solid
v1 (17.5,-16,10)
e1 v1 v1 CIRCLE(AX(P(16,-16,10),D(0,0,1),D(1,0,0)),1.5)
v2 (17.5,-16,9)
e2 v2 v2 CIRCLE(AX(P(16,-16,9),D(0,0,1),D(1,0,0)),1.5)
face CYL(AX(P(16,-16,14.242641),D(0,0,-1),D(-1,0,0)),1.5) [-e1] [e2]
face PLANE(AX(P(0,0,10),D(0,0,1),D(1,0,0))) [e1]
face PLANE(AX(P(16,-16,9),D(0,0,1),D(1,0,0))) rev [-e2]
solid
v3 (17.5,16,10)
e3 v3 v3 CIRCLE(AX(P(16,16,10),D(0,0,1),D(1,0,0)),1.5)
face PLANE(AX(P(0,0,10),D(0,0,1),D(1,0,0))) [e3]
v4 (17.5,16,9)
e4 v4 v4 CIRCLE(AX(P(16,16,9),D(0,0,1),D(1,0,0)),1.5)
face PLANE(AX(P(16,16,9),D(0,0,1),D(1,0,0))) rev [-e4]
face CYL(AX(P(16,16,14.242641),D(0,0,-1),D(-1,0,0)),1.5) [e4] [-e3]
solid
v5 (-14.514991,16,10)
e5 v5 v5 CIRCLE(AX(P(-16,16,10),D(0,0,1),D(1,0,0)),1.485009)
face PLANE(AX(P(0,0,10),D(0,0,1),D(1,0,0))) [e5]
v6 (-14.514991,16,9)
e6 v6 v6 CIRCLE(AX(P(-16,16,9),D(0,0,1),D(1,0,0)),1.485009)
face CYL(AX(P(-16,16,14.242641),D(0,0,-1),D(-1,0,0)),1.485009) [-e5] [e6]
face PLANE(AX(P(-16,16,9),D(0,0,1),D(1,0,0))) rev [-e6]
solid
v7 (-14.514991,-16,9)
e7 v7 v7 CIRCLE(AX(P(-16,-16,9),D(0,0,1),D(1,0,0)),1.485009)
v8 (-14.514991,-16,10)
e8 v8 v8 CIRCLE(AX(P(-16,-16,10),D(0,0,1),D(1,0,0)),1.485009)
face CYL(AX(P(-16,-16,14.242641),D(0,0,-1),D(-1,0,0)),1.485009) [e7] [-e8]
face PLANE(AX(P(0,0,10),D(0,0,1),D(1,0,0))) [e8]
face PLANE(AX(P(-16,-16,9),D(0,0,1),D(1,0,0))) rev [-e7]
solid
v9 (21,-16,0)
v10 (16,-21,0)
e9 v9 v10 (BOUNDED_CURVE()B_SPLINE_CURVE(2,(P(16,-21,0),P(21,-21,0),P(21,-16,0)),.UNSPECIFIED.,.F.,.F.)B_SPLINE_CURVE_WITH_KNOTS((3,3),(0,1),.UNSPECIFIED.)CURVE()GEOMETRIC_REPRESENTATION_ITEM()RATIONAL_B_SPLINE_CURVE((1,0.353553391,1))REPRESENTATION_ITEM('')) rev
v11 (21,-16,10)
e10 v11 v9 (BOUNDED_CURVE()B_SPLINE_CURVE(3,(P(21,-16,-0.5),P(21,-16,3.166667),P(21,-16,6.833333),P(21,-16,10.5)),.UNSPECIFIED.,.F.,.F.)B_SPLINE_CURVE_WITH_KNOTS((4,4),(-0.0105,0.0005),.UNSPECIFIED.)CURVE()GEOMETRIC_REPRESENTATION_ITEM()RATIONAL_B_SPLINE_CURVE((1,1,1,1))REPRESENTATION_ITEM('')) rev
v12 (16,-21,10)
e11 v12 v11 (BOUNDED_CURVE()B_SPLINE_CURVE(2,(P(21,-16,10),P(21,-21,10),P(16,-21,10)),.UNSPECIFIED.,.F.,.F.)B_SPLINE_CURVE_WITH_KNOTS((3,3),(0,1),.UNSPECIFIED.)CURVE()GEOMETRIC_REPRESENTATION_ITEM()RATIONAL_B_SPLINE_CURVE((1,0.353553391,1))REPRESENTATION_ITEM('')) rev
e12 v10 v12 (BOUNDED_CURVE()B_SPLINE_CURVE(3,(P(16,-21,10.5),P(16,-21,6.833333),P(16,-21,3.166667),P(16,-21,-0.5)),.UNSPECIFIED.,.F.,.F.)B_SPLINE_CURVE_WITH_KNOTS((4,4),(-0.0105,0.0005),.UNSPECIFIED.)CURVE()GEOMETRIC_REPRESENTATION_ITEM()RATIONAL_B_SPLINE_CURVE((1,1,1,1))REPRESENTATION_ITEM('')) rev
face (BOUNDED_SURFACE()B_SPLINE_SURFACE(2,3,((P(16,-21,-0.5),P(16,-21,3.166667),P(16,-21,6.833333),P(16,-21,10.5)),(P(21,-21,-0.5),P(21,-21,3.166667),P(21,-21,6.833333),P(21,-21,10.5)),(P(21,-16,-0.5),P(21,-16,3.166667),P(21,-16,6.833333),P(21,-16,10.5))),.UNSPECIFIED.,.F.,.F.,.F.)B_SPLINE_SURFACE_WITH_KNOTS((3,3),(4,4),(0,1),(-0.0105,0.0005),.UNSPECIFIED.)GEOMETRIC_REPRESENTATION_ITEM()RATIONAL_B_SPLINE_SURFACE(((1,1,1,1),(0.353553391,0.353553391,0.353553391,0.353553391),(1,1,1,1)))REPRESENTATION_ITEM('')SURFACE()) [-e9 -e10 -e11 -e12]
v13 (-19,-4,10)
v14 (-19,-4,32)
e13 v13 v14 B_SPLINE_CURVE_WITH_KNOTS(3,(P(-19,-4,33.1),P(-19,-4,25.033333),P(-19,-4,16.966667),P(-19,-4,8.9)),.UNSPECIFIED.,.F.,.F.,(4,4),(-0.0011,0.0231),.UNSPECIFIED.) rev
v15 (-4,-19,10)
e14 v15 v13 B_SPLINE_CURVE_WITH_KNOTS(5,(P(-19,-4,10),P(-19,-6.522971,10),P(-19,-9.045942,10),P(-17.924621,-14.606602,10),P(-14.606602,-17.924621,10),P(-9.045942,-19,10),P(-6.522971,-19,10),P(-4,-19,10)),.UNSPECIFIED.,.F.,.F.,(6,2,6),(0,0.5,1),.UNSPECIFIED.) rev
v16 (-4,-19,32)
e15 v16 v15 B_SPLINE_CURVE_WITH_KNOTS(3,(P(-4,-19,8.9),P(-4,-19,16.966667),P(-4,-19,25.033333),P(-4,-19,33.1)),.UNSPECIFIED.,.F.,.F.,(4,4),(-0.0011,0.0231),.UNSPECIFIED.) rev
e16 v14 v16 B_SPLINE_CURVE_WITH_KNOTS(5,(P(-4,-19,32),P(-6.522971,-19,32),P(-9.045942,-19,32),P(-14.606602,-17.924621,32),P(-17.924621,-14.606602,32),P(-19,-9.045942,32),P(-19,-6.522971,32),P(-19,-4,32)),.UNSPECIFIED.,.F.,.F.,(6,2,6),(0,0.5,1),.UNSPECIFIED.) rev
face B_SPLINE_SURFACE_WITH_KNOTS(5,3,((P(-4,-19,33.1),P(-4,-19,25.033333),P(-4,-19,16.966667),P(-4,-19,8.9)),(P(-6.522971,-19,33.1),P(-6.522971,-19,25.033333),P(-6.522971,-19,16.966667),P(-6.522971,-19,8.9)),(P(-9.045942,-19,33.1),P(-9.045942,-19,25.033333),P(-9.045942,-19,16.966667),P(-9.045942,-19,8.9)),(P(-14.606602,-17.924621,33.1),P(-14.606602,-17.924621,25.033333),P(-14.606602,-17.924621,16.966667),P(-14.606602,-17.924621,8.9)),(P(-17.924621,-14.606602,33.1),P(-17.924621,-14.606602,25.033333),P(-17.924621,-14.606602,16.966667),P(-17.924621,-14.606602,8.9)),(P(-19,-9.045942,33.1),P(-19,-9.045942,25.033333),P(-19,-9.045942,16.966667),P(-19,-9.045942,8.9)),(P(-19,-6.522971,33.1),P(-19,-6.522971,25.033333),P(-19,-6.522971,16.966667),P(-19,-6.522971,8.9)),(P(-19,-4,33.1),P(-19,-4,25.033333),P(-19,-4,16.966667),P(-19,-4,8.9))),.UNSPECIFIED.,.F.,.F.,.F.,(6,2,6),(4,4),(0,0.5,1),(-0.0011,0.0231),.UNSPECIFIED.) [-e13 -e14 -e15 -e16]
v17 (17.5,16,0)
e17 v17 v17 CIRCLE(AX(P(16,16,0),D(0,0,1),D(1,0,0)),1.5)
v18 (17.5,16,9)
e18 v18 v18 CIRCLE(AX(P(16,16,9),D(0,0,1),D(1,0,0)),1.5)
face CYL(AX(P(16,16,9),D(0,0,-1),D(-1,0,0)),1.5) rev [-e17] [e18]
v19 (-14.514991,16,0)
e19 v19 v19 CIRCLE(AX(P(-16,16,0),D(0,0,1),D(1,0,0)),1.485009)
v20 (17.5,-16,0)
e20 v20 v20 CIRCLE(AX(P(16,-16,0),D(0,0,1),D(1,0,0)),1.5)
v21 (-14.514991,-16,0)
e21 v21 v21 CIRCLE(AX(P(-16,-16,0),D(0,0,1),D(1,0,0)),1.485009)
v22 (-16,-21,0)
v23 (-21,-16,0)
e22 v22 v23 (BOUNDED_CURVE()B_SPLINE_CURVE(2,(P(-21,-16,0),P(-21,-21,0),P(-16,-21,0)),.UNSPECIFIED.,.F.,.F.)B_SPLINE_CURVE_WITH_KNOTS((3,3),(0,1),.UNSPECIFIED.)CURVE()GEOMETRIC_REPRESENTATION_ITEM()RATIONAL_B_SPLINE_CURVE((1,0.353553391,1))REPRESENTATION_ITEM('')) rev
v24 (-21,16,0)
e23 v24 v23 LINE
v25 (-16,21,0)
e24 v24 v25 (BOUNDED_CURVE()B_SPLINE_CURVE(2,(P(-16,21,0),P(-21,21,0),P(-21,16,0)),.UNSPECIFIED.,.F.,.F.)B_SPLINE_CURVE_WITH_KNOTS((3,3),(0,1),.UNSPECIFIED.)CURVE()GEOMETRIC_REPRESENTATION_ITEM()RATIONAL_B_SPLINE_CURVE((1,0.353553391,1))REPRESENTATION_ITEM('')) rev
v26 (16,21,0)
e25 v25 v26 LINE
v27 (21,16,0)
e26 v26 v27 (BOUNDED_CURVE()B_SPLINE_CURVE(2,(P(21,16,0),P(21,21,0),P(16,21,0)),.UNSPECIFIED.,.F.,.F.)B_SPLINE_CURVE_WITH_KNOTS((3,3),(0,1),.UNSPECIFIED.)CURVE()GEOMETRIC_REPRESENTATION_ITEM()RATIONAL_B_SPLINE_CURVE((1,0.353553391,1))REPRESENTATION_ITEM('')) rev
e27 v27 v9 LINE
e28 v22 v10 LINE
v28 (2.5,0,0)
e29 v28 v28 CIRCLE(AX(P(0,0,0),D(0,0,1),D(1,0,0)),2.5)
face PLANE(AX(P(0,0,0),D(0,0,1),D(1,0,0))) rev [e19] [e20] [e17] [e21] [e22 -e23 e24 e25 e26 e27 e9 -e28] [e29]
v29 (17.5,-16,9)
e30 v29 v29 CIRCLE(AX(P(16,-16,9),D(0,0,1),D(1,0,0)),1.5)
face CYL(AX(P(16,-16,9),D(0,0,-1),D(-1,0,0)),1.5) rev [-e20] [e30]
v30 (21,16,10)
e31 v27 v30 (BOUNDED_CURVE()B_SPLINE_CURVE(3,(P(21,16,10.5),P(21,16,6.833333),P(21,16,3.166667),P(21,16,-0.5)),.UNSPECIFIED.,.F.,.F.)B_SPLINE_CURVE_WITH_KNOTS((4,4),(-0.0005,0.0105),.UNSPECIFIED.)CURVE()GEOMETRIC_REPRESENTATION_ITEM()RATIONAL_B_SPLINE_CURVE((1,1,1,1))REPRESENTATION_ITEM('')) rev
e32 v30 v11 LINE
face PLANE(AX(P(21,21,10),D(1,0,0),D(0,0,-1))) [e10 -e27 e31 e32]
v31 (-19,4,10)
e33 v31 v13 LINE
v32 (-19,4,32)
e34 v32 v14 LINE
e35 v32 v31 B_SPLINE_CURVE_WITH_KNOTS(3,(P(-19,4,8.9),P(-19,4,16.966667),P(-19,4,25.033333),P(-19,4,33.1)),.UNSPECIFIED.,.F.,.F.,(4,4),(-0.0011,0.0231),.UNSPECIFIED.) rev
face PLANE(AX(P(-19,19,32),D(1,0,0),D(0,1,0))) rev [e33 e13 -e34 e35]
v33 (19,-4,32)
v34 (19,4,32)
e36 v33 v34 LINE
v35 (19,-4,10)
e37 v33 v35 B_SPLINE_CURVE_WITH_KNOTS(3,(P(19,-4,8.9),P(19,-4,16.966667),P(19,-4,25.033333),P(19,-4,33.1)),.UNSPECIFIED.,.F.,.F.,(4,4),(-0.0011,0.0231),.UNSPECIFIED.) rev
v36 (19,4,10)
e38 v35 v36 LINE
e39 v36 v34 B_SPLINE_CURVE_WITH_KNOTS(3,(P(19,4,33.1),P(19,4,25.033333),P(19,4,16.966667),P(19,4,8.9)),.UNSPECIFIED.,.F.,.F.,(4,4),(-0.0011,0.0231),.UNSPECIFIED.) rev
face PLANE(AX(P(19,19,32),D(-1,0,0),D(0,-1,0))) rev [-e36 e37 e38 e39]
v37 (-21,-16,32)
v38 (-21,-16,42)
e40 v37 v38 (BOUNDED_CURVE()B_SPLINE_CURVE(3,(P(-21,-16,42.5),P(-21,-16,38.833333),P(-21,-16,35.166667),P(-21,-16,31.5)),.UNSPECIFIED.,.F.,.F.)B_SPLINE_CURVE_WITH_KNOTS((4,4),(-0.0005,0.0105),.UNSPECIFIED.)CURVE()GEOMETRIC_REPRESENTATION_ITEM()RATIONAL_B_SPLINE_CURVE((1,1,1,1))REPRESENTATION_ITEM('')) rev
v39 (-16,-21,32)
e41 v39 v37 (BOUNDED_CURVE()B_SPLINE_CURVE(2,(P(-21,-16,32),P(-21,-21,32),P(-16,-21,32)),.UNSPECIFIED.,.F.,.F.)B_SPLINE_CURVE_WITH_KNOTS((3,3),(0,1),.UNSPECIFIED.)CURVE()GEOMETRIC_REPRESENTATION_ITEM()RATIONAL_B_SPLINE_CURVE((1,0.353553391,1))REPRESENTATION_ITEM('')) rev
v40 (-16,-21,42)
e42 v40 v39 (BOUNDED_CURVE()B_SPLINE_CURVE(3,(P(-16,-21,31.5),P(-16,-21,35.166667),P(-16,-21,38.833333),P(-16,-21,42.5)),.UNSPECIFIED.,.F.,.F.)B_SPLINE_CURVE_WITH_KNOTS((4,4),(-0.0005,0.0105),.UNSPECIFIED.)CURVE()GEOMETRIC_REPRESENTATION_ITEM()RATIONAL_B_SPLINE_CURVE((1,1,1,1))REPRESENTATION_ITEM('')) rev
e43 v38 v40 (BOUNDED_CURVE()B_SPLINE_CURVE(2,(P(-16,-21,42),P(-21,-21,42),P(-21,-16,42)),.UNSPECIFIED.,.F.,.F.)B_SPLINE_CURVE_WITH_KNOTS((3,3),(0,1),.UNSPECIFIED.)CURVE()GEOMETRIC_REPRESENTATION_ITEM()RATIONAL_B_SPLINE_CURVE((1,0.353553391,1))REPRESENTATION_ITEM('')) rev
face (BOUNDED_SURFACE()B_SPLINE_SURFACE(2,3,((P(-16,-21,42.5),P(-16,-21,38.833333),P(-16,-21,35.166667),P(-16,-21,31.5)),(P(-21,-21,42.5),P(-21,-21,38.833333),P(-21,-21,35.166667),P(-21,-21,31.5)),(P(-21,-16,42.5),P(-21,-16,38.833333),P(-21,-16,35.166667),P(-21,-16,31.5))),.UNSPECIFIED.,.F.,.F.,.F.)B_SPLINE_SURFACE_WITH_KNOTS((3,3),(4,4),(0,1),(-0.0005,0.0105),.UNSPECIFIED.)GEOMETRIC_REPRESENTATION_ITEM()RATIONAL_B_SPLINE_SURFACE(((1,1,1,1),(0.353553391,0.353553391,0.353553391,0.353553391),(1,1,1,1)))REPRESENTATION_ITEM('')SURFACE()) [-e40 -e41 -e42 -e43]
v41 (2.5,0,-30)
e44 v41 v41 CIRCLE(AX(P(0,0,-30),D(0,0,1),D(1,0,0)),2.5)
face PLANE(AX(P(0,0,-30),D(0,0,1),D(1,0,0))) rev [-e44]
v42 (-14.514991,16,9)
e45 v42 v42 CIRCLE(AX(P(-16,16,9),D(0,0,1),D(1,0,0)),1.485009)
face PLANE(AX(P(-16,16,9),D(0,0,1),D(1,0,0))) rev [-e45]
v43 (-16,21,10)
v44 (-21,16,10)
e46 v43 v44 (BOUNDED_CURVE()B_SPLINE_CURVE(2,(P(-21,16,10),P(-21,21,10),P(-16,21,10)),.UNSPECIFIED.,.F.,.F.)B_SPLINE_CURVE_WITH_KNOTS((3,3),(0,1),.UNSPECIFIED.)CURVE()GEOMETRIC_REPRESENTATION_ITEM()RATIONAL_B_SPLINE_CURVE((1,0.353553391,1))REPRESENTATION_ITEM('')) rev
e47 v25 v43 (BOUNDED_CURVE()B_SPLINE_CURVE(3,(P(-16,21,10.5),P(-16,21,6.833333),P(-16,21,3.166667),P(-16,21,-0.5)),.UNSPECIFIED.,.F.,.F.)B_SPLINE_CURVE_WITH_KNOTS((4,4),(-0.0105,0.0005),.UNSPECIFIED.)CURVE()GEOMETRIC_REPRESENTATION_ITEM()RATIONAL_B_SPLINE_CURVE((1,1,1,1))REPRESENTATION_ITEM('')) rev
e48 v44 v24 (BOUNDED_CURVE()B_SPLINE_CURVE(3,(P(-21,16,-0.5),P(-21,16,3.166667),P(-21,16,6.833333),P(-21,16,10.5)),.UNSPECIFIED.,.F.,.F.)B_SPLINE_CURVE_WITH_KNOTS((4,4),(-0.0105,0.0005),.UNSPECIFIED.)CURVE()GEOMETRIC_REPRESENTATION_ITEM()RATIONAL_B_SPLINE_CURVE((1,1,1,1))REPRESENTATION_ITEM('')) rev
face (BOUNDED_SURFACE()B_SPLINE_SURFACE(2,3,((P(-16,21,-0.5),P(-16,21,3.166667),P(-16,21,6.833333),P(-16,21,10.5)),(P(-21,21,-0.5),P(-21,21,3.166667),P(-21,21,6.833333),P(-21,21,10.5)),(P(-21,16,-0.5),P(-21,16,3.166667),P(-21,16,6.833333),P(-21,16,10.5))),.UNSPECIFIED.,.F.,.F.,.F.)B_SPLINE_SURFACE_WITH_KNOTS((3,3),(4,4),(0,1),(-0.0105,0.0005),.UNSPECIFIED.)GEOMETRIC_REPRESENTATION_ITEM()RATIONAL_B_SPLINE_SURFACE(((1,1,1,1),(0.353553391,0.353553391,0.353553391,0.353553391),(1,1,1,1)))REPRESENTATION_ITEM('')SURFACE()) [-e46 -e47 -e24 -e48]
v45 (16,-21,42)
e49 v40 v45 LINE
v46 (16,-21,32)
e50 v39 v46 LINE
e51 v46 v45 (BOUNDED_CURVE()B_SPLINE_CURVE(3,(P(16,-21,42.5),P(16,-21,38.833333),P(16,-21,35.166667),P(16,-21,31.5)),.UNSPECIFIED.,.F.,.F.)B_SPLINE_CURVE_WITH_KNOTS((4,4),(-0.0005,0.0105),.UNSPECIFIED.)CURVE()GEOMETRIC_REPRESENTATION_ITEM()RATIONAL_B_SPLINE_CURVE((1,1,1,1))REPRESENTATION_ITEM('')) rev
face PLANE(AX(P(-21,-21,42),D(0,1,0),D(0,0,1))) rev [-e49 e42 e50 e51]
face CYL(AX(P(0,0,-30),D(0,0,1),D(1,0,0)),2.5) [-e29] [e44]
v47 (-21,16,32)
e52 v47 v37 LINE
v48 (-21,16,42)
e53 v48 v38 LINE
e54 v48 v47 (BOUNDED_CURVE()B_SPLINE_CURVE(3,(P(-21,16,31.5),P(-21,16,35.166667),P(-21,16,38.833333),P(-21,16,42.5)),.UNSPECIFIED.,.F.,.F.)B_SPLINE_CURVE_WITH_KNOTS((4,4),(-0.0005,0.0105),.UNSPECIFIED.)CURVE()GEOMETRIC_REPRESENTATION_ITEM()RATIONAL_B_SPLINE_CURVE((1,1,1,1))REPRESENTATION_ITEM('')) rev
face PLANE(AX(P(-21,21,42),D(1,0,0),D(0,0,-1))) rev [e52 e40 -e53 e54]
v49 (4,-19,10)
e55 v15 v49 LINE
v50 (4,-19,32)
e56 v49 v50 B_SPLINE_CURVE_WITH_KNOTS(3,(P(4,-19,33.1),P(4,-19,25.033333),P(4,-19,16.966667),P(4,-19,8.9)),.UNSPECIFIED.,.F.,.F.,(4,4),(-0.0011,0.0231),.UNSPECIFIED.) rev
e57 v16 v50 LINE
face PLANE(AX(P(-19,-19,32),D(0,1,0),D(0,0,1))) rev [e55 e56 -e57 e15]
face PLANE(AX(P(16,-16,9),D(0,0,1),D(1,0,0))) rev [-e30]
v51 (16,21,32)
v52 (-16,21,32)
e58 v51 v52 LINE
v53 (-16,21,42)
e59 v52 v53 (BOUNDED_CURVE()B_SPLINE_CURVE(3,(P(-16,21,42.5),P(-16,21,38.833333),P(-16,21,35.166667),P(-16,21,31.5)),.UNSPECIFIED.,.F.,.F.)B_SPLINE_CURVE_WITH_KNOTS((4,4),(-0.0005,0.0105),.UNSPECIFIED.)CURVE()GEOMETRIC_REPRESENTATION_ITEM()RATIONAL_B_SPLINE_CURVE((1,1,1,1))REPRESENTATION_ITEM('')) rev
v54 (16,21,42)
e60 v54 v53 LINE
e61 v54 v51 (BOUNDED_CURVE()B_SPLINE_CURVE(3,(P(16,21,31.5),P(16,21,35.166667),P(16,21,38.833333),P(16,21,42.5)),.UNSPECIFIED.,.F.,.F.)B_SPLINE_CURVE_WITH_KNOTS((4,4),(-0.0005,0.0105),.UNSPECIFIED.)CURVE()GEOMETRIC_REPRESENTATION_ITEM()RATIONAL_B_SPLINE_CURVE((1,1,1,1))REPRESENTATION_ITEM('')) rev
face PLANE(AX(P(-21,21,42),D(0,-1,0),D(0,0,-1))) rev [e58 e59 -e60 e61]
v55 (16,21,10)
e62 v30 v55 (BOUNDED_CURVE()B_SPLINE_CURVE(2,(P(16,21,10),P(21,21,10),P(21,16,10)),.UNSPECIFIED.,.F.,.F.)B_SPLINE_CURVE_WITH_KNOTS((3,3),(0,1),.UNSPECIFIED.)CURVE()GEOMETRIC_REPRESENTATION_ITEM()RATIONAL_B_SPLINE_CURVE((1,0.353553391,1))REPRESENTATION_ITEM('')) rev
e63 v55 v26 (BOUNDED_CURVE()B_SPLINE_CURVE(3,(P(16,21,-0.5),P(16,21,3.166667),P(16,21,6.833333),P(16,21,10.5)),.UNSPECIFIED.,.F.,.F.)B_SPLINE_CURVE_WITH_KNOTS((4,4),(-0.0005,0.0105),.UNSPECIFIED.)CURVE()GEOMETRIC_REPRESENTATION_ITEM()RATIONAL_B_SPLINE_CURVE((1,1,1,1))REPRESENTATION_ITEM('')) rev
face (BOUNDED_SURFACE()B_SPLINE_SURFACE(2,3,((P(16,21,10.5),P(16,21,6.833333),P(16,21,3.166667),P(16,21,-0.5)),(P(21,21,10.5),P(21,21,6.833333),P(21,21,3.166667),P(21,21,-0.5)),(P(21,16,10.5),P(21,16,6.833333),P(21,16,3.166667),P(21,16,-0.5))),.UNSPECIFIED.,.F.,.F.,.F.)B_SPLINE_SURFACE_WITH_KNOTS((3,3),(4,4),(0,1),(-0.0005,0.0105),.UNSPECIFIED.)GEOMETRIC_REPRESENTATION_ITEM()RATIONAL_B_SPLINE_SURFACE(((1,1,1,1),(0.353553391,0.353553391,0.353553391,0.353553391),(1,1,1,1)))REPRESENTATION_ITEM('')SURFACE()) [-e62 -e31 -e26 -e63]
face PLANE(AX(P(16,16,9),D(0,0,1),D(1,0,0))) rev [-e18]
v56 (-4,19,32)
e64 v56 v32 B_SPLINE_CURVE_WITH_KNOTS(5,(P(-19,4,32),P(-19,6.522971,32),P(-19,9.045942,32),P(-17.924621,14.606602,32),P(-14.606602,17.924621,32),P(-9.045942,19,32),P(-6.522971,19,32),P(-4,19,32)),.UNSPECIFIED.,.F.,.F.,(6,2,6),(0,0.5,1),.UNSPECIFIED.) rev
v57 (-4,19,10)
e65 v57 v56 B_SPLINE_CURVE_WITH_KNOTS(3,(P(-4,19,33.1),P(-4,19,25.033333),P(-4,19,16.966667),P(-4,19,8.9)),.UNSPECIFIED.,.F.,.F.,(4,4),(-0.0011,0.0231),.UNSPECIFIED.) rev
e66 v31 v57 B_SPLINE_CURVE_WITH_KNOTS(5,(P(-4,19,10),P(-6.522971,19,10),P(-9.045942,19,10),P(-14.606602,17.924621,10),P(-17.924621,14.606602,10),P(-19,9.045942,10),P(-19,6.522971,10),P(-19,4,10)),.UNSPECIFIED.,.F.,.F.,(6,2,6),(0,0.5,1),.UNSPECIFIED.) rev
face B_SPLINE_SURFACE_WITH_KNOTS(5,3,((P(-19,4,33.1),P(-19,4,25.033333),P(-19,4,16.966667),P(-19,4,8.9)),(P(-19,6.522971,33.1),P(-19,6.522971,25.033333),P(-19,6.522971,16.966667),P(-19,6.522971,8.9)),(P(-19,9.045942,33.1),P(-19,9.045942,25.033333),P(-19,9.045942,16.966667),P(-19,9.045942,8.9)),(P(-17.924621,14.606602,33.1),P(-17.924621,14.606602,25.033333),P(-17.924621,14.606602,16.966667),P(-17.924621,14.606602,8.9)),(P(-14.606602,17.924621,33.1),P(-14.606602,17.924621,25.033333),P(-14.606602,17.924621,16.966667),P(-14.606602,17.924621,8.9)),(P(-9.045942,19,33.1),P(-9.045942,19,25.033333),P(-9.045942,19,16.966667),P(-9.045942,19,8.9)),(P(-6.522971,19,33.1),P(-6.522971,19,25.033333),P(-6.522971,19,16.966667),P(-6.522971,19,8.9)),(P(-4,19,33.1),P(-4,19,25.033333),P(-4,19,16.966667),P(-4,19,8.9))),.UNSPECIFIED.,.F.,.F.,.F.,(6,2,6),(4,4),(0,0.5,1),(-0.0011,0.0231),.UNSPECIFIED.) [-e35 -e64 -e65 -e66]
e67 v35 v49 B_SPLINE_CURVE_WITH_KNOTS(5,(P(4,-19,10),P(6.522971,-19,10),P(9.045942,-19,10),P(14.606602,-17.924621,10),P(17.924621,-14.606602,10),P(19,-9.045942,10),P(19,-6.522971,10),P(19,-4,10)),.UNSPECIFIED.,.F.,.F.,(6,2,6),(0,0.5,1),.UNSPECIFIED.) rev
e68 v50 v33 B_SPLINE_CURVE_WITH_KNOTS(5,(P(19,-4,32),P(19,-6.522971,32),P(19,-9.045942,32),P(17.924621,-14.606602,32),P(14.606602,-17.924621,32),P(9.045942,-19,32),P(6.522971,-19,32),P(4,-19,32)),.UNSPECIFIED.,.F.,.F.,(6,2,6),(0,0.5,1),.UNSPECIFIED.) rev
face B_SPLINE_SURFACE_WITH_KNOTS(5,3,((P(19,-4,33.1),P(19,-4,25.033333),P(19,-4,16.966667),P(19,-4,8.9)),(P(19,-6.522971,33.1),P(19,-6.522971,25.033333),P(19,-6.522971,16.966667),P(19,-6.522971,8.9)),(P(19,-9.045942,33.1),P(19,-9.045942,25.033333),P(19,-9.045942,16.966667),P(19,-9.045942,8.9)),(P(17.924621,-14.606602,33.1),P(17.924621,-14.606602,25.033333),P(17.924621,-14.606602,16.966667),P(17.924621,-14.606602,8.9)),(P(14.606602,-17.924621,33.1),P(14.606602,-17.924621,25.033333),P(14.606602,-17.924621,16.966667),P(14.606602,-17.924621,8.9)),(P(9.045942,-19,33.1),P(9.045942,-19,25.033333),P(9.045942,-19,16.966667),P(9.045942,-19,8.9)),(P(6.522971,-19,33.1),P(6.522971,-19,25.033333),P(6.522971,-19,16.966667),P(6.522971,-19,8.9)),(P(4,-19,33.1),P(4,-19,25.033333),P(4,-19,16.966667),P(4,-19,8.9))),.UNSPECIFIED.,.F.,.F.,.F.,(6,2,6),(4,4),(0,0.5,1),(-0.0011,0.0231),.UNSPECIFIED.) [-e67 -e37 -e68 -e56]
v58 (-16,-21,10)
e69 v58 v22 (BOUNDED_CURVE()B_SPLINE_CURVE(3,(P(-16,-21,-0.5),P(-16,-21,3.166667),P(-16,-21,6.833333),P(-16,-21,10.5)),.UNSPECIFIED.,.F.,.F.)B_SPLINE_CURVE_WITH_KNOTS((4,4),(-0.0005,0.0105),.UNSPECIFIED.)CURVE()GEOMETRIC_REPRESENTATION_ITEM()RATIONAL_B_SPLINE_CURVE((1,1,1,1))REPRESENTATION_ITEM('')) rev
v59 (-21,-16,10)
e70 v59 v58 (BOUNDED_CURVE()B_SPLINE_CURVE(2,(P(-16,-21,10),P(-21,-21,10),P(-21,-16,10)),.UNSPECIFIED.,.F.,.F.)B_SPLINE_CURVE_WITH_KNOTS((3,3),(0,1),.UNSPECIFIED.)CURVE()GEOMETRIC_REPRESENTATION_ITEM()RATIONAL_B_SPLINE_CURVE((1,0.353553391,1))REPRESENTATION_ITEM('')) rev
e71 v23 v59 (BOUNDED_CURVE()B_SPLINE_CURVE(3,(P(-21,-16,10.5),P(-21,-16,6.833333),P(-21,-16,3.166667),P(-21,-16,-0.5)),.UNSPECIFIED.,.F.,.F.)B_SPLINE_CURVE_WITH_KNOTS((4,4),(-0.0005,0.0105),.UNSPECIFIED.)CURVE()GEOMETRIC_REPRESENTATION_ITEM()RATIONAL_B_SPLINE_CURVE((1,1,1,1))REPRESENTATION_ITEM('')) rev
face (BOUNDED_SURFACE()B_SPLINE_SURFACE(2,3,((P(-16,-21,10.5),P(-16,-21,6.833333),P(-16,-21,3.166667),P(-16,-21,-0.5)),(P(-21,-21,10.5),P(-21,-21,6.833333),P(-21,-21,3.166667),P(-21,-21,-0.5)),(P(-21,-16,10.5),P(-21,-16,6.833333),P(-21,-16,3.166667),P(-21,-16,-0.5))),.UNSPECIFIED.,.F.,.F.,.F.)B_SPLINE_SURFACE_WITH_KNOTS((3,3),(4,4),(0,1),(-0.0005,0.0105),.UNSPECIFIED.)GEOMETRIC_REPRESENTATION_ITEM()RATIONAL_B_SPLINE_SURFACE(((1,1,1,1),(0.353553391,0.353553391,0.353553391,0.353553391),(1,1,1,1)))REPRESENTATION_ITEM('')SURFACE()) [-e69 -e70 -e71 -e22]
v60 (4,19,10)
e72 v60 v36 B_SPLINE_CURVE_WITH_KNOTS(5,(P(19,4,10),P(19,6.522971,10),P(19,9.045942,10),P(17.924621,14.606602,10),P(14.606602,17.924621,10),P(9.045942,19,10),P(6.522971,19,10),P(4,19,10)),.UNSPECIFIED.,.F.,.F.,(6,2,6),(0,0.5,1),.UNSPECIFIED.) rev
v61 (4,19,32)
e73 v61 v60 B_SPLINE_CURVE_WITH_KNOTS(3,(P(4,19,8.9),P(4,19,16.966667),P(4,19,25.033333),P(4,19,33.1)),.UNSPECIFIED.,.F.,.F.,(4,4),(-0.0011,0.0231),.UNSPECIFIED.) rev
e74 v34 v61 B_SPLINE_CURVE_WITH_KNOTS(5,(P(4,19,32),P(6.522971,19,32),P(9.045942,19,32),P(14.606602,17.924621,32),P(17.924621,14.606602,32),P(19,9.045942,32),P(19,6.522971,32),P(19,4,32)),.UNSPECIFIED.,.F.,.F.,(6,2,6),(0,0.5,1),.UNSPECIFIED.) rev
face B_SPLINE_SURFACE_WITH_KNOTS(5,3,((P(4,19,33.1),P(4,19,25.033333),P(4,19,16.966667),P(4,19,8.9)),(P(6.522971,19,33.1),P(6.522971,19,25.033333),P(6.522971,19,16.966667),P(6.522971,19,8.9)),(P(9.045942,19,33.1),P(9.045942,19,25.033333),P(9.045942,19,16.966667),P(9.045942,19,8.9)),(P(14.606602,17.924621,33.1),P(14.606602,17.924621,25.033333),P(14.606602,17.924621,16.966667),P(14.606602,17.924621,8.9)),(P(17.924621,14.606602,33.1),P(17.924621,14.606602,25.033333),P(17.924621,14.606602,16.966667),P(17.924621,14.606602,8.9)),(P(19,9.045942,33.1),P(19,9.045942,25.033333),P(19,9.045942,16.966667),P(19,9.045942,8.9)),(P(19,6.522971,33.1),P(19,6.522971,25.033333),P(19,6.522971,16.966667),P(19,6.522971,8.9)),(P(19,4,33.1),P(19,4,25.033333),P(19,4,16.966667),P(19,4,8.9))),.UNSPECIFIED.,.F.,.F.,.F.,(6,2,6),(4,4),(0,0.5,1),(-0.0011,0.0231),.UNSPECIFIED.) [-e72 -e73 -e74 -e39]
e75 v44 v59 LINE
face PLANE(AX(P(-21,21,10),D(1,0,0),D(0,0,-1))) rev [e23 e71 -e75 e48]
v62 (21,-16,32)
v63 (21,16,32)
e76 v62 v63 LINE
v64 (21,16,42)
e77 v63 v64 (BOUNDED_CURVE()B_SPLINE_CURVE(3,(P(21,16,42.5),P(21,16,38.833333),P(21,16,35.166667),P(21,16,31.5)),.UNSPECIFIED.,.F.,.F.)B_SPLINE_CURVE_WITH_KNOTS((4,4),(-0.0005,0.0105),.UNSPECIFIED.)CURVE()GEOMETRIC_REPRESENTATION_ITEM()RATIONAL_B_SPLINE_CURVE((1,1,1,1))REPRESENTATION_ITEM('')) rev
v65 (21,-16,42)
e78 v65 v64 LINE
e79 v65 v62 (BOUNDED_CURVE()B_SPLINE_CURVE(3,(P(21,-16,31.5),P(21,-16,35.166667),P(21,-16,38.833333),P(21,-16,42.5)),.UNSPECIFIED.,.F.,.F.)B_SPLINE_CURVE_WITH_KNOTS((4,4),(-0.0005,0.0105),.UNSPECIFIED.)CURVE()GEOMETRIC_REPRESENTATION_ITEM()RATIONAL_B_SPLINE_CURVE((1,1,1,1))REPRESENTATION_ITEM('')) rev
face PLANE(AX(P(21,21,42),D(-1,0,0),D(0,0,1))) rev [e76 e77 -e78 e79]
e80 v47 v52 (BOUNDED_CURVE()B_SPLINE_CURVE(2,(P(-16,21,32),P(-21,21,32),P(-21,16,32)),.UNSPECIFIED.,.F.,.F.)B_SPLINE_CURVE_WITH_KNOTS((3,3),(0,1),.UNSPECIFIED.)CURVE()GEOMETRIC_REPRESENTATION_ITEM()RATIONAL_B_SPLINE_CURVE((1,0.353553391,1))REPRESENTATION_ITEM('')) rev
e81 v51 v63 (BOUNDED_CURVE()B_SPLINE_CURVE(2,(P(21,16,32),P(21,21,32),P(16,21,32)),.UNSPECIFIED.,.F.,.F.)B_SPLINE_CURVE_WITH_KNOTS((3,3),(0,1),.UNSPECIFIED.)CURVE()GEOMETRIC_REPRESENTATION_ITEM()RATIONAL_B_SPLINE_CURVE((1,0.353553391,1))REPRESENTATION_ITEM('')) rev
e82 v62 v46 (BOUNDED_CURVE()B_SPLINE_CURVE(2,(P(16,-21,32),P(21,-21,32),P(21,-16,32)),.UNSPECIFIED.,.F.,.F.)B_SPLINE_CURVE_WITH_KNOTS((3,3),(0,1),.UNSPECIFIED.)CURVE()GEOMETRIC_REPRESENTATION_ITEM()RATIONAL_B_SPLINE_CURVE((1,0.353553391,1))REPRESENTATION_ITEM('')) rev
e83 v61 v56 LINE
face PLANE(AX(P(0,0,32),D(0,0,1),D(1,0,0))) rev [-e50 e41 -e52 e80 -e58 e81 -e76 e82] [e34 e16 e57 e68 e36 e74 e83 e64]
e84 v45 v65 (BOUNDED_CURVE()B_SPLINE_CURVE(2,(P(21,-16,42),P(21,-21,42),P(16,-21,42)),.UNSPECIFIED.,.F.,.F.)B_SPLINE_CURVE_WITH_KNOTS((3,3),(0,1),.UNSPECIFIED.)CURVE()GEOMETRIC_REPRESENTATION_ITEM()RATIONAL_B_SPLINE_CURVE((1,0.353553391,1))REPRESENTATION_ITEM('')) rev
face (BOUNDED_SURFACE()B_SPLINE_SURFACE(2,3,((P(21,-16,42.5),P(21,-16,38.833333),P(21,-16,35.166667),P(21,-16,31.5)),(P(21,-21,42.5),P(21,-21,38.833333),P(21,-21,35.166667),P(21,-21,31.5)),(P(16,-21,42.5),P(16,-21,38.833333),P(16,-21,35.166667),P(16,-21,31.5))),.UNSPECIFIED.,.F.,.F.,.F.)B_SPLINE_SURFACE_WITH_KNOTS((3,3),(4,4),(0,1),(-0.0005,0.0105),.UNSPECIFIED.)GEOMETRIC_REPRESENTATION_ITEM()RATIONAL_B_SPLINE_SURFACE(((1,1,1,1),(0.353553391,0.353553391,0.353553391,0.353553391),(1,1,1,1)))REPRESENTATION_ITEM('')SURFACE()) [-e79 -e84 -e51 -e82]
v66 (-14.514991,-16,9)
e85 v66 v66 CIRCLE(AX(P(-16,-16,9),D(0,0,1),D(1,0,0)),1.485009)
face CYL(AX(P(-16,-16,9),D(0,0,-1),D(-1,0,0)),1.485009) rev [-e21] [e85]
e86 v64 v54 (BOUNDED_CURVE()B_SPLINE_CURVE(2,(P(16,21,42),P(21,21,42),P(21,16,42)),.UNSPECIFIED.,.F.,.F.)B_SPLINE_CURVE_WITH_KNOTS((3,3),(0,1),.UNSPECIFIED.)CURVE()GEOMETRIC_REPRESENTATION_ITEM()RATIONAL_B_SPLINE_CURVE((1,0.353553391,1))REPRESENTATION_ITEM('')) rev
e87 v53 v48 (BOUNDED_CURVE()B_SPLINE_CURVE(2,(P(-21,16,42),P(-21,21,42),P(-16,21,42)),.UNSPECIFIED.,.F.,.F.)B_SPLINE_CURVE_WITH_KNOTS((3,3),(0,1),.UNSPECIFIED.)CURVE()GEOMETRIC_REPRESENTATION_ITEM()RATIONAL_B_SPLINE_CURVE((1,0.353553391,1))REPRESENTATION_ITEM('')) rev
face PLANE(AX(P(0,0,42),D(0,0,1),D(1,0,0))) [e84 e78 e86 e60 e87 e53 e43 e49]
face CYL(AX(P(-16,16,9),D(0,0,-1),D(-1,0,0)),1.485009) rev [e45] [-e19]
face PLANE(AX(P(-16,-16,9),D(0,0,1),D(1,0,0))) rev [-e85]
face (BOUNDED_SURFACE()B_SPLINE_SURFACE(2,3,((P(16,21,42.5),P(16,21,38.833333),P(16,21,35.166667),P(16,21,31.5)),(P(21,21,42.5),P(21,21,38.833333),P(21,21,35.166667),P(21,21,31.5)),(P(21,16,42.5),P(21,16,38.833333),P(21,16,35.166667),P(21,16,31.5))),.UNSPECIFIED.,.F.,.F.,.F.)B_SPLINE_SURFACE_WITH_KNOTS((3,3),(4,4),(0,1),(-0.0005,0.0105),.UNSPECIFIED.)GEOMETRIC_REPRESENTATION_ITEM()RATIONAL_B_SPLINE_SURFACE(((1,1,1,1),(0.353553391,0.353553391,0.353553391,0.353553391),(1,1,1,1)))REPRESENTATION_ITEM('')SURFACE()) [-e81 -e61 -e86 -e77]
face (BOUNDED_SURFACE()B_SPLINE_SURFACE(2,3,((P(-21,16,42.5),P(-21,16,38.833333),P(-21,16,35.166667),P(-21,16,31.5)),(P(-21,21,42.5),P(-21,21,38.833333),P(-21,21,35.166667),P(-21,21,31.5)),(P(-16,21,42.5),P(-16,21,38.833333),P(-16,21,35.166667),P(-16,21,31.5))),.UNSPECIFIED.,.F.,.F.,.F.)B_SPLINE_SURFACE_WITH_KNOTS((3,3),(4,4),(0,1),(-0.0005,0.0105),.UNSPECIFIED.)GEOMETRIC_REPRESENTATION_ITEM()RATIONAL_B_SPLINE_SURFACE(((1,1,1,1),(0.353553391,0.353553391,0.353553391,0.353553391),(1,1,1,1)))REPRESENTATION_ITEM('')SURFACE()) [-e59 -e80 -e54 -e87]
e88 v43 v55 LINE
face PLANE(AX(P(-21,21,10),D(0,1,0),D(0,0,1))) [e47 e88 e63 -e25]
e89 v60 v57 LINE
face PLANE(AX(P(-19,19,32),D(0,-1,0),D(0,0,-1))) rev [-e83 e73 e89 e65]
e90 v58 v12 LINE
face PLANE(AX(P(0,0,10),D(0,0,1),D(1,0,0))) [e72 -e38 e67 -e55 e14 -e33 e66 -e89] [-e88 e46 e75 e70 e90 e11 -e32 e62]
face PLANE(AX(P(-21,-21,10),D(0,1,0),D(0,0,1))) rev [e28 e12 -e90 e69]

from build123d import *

# Parameters (mm, degrees)
BOSS_EXTRUDE1_START   = 10
SKETCH1_W             = 38
SKETCH1_H             = 38
BOSS_EXTRUDE1_DEPTH   = 22
SKETCH2_W             = 42
SKETCH2_H             = 42
BOSS_EXTRUDE2_DEPTH   = 10
BOSS_EXTRUDE3_START   = 32
SKETCH4_W             = 42
SKETCH4_H             = 42
BOSS_EXTRUDE3_DEPTH   = 10
FILLET1_SIZE          = 15
FILLET2_SIZE          = 5
SKETCH5_R             = 2.5
BOSS_EXTRUDE4_DEPTH   = 30
SKETCH6_R             = 1.5
BOSS_EXTRUDE5_DEPTH   = 10
SKETCH6_R_2           = 1.485008889
BOSS_EXTRUDE5_2_DEPTH = 10
BOSS_EXTRUDE5_3_DEPTH = 10
BOSS_EXTRUDE5_4_DEPTH = 10
SKETCH6_2_R           = 1.5
SKETCH6_2_R_2         = 1.485008889
CUT_EXTRUDE1_DEPTH    = 9


with BuildPart() as part:
    # Sketch1 → Boss-Extrude1 (new body)
    with BuildSketch(Plane.XY.offset(BOSS_EXTRUDE1_START)):
        Rectangle(SKETCH1_W, SKETCH1_H)
    extrude(amount=BOSS_EXTRUDE1_DEPTH)

    # Sketch2 → Boss-Extrude2 (add)
    with BuildSketch(Plane.XY):
        Rectangle(SKETCH2_W, SKETCH2_H)
    extrude(amount=BOSS_EXTRUDE2_DEPTH)

    # Sketch4 → Boss-Extrude3 (add)
    with BuildSketch(Plane.XY.offset(BOSS_EXTRUDE3_START)):
        Rectangle(SKETCH4_W, SKETCH4_H)
    extrude(amount=BOSS_EXTRUDE3_DEPTH)

    # Fillet1
    # a fillet whose section is not a circle: 15 mm, written as the material it takes off along each edge
    with BuildSketch(Plane(origin=(-19, 19, 10), x_dir=(1, 0, 0), z_dir=(0, 0, 1))) as fillet1_piece_1:
        with BuildLine():
            add(Edge.make_bspline([(FILLET1_SIZE, 0), (FILLET1_SIZE * 0.831801948466, 0), (FILLET1_SIZE * 0.663603896932, 0), (FILLET1_SIZE * 0.292893218813, -FILLET1_SIZE * 0.0716919198361), (FILLET1_SIZE * 0.0716919198361, -FILLET1_SIZE * 0.292893218813), (0, -FILLET1_SIZE * 0.663603896932), (0, -FILLET1_SIZE * 0.831801948466), (0, -FILLET1_SIZE)], knots=[0, 0, 0, 0, 0, 0, 0.5, 0.5, 1, 1, 1, 1, 1, 1], degree=5))
            Line((0, -FILLET1_SIZE), (-FILLET1_SIZE * 0.02, -FILLET1_SIZE))
            Line((-FILLET1_SIZE * 0.02, -FILLET1_SIZE), (-FILLET1_SIZE * 0.02, FILLET1_SIZE * 0.02))
            Line((-FILLET1_SIZE * 0.02, FILLET1_SIZE * 0.02), (FILLET1_SIZE, FILLET1_SIZE * 0.02))
            Line((FILLET1_SIZE, FILLET1_SIZE * 0.02), (FILLET1_SIZE, 0))
        make_face()
    extrude(amount=22, mode=Mode.SUBTRACT)
    with BuildSketch(Plane(origin=(-19, -19, 10), x_dir=(1, 0, 0), z_dir=(0, 0, 1)), Plane(origin=(19, -19, 10), x_dir=(0, 1, 0), z_dir=(0, 0, 1)), Plane(origin=(19, 19, 10), x_dir=(-1, 0, 0), z_dir=(0, 0, 1))) as fillet1_piece_2:
        with BuildLine():
            add(Edge.make_bspline([(FILLET1_SIZE, 0), (FILLET1_SIZE * 0.831801948466, 0), (FILLET1_SIZE * 0.663603896932, 0), (FILLET1_SIZE * 0.292893218813, FILLET1_SIZE * 0.0716919198361), (FILLET1_SIZE * 0.0716919198361, FILLET1_SIZE * 0.292893218813), (0, FILLET1_SIZE * 0.663603896932), (0, FILLET1_SIZE * 0.831801948466), (0, FILLET1_SIZE)], knots=[0, 0, 0, 0, 0, 0, 0.5, 0.5, 1, 1, 1, 1, 1, 1], degree=5))
            Line((0, FILLET1_SIZE), (-FILLET1_SIZE * 0.02, FILLET1_SIZE))
            Line((-FILLET1_SIZE * 0.02, FILLET1_SIZE), (-FILLET1_SIZE * 0.02, -FILLET1_SIZE * 0.02))
            Line((-FILLET1_SIZE * 0.02, -FILLET1_SIZE * 0.02), (FILLET1_SIZE, -FILLET1_SIZE * 0.02))
            Line((FILLET1_SIZE, -FILLET1_SIZE * 0.02), (FILLET1_SIZE, 0))
        make_face()
    extrude(amount=22, mode=Mode.SUBTRACT)

    # Fillet2
    # a fillet whose section is not a circle: 5 mm, written as the material it takes off along each edge
    with BuildSketch(Plane(origin=(-21, -21, 19.5), x_dir=(0, 1, 0), z_dir=(0, 0, 1)), Plane(origin=(-21, -21, -12.5), x_dir=(0, 1, 0), z_dir=(0, 0, 1)), Plane(origin=(-21, 21, -12.5), x_dir=(1, 0, 0), z_dir=(0, 0, 1)), Plane(origin=(-21, 21, 19.5), x_dir=(1, 0, 0), z_dir=(0, 0, 1))) as fillet2_piece_1:
        with BuildLine():
            Bezier((FILLET2_SIZE, 0), (0, 0), (0, -FILLET2_SIZE), weights=[1, 0.353553391, 1])
            Line((0, -FILLET2_SIZE), (0, 0))
            Line((0, 0), (FILLET2_SIZE, 0))
        make_face()
    extrude(amount=35, mode=Mode.SUBTRACT)
    with BuildSketch(Plane(origin=(21, -21, -12.5), x_dir=(0, 1, 0), z_dir=(0, 0, 1)), Plane(origin=(21, -21, 19.5), x_dir=(0, 1, 0), z_dir=(0, 0, 1)), Plane(origin=(21, 21, -12.5), x_dir=(-1, 0, 0), z_dir=(0, 0, 1)), Plane(origin=(21, 21, 19.5), x_dir=(-1, 0, 0), z_dir=(0, 0, 1))) as fillet2_piece_2:
        with BuildLine():
            Bezier((FILLET2_SIZE, 0), (0, 0), (0, FILLET2_SIZE), weights=[1, 0.353553391, 1])
            Line((0, FILLET2_SIZE), (0, 0))
            Line((0, 0), (FILLET2_SIZE, 0))
        make_face()
    extrude(amount=35, mode=Mode.SUBTRACT)

    # Sketch5 → Boss-Extrude4 (add)
    with BuildSketch(Plane.XY):
        Circle(SKETCH5_R)
    extrude(amount=-BOSS_EXTRUDE4_DEPTH)


with BuildPart() as body_2:
    # Sketch6 → Boss-Extrude5 (new body)
    with BuildSketch(Plane.XY):
        with Locations((16, 16)):
            Circle(SKETCH6_R)
    extrude(amount=BOSS_EXTRUDE5_DEPTH)


with BuildPart() as body_3:
    # Sketch6 → Boss-Extrude5 2 (new body)
    with BuildSketch(Plane.XY):
        with Locations((-16, 16)):
            Circle(SKETCH6_R_2)
    extrude(amount=BOSS_EXTRUDE5_2_DEPTH)


with BuildPart() as body_4:
    # Sketch6 → Boss-Extrude5 3 (new body)
    with BuildSketch(Plane.XY):
        with Locations((16, -16)):
            Circle(SKETCH6_R)
    extrude(amount=BOSS_EXTRUDE5_3_DEPTH)


with BuildPart() as body_5:
    # Sketch6 → Boss-Extrude5 4 (new body)
    with BuildSketch(Plane.XY):
        with Locations((-16, -16)):
            Circle(SKETCH6_R_2)
    extrude(amount=BOSS_EXTRUDE5_4_DEPTH)


with BuildPart() as cut_extrude1_tool:
    # Sketch6<2> → Cut-Extrude1 (new body)
    with BuildSketch(Plane.XY):
        with Locations((16, 16)):
            Circle(SKETCH6_2_R)
        with Locations((-16, 16)):
            Circle(SKETCH6_2_R_2)
        with Locations((16, -16)):
            Circle(SKETCH6_2_R)
        with Locations((-16, -16)):
            Circle(SKETCH6_2_R_2)
    extrude(amount=CUT_EXTRUDE1_DEPTH)


with BuildPart() as part_1:
    add(part.part)

    # Cut-Extrude1: cut by cut_extrude1_tool
    add(cut_extrude1_tool.part, mode=Mode.SUBTRACT)


with BuildPart() as body_2_1:
    add(body_2.part)

    # Cut-Extrude1: cut by cut_extrude1_tool
    add(cut_extrude1_tool.part, mode=Mode.SUBTRACT)


with BuildPart() as body_3_1:
    add(body_3.part)

    # Cut-Extrude1: cut by cut_extrude1_tool
    add(cut_extrude1_tool.part, mode=Mode.SUBTRACT)


with BuildPart() as body_4_1:
    add(body_4.part)

    # Cut-Extrude1: cut by cut_extrude1_tool
    add(cut_extrude1_tool.part, mode=Mode.SUBTRACT)


with BuildPart() as body_5_1:
    add(body_5.part)

    # Cut-Extrude1: cut by cut_extrude1_tool
    add(cut_extrude1_tool.part, mode=Mode.SUBTRACT)


solid = Compound([part_1.part, body_2_1.part, body_3_1.part, body_4_1.part, body_5_1.part])
